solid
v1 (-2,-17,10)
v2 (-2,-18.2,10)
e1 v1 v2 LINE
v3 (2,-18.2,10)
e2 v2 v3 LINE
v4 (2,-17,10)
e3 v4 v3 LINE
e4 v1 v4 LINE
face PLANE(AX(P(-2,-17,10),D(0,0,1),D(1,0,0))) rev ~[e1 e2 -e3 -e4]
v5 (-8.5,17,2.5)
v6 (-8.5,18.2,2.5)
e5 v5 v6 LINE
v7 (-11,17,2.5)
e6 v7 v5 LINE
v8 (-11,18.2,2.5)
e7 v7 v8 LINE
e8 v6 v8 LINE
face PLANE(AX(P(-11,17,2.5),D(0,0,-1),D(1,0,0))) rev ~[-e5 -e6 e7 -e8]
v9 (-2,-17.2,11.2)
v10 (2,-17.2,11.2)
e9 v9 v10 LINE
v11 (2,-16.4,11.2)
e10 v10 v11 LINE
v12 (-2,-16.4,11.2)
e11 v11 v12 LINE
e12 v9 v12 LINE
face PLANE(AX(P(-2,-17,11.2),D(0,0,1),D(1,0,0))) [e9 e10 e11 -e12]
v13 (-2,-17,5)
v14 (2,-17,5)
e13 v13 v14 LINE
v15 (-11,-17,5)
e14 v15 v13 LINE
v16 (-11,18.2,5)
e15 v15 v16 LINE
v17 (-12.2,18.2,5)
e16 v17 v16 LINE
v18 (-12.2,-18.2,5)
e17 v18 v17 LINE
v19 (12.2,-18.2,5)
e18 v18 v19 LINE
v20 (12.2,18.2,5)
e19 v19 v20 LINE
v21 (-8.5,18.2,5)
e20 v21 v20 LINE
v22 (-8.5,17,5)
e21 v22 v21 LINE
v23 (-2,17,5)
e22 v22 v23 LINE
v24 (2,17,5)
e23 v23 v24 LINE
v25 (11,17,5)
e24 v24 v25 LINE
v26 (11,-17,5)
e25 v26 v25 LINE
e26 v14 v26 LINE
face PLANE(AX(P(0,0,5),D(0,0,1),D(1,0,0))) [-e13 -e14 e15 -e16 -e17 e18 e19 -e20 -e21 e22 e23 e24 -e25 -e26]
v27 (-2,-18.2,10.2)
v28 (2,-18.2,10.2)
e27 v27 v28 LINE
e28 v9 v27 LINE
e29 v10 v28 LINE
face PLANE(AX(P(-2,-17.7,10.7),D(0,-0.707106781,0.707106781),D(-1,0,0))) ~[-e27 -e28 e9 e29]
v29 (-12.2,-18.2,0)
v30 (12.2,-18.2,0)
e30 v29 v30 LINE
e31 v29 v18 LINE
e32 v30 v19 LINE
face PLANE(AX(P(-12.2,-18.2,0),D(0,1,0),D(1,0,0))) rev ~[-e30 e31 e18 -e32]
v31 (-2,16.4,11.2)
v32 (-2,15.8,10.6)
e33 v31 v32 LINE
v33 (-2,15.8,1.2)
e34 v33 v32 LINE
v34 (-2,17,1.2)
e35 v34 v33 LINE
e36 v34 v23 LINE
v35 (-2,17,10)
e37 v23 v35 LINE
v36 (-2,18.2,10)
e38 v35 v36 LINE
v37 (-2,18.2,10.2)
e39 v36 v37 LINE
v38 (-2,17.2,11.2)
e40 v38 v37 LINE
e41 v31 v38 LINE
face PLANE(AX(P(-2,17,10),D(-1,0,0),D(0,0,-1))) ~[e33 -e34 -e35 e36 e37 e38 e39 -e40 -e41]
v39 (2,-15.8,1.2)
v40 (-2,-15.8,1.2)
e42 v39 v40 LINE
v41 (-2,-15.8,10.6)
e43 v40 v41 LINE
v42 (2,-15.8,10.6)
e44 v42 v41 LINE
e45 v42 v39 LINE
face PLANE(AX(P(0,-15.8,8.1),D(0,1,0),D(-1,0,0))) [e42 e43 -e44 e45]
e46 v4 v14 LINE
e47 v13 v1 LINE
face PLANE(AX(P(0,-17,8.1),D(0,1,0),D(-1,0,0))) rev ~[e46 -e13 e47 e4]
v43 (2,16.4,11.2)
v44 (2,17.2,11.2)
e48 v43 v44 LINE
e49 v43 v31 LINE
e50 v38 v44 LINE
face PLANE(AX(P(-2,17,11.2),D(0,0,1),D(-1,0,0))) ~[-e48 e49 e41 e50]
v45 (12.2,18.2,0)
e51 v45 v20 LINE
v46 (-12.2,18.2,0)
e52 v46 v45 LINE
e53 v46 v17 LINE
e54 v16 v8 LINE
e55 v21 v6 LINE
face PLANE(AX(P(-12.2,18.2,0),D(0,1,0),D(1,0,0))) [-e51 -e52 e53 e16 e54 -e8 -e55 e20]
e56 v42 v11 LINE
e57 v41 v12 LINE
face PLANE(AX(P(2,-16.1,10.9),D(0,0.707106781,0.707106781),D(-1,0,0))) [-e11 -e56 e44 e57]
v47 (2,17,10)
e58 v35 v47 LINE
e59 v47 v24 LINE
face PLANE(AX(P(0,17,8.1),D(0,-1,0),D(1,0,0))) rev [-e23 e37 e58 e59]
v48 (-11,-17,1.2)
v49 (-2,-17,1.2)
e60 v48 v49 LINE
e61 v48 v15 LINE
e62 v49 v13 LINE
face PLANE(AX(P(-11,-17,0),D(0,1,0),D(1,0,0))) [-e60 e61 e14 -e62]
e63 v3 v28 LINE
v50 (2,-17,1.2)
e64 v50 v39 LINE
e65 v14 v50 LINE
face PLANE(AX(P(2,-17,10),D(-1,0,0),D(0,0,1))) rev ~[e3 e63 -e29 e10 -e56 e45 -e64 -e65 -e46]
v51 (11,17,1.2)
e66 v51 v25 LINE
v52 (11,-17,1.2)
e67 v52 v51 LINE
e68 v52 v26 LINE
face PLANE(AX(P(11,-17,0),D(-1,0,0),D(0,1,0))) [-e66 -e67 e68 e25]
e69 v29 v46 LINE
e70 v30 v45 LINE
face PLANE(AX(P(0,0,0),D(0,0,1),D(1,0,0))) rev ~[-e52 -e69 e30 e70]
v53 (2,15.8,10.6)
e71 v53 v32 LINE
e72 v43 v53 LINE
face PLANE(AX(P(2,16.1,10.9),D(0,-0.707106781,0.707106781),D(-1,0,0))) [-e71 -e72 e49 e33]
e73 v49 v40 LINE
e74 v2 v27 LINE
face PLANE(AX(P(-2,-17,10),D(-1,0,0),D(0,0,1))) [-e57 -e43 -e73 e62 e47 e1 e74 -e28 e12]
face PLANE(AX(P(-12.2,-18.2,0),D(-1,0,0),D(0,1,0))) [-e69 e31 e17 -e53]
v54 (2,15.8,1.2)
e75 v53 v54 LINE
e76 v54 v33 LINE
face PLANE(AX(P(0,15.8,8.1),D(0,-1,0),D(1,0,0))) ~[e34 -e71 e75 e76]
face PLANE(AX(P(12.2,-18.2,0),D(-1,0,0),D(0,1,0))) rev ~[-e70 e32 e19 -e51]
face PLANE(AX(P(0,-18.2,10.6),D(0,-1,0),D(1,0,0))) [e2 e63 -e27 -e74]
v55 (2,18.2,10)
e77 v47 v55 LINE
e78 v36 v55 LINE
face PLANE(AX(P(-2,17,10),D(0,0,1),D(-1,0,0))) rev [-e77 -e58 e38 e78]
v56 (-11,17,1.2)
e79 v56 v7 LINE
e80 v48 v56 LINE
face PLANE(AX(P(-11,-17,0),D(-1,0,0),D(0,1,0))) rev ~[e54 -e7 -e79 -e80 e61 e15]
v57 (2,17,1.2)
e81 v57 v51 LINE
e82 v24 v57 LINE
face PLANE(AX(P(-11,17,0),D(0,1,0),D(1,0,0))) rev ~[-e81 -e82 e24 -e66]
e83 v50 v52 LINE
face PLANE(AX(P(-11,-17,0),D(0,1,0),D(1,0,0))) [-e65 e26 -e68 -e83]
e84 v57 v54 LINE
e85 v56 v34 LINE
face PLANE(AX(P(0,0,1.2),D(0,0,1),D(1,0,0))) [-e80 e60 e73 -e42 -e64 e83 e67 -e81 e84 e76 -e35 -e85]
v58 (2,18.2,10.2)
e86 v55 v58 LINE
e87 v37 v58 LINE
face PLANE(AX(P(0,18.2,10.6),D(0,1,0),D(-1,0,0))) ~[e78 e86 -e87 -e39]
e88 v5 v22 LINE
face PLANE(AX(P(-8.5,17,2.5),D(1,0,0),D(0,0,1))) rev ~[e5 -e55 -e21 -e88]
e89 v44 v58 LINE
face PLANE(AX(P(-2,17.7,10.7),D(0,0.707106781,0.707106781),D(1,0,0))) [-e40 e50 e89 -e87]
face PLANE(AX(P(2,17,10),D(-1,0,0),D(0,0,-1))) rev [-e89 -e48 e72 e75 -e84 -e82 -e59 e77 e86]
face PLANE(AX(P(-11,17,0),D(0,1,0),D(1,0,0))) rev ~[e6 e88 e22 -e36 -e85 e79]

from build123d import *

# Parameters (mm, degrees)
F0_W      = 22
F0_H      = 34
F1_DEPTH  = 1.2
F0_W_2    = 24.4
F0_H_2    = 36.4
F2_DEPTH  = 5
F3_W      = 4
F3_H      = 6.2
F3_H_2    = 3.8
F4_DEPTH  = 1.2
F5_SIZE   = 0.6
F6_W      = 4
F6_H      = 1.2
F7_DEPTH  = 1.2
F8_SIZE   = 1
F9_W      = 2.5
F9_H      = 2.5
F10_DEPTH = 25


# Not quite as in the source:
# - a pattern or mirror of a feature is missing from the dataset's text; its kind, count and spacing are read off the source's solid


with BuildPart() as f1:
    # F0 (on Top) → F1 (new body)
    with BuildSketch(Plane.XY):
        Rectangle(F0_W, F0_H)
    extrude(amount=F1_DEPTH)

    # F0 (on Top) → F2 (join)
    with BuildSketch(Plane.XY):
        Rectangle(F0_W_2, F0_H_2)
        Rectangle(F0_W, F0_H, mode=Mode.SUBTRACT)
    extrude(amount=F2_DEPTH)

    # F3 (on face) → F4 (join)
    with BuildSketch(Plane(origin=(0, -17, 0), x_dir=(-1, 0, 0), z_dir=(0, 1, 0))):
        with Locations((0, 8.1)):
            Rectangle(F3_W, F3_H)
        with Locations((0, 3.1)):
            Rectangle(F3_W, F3_H_2)
    f4 = extrude(amount=F4_DEPTH)

    # F4_copies: F4 across plane
    add(f4.mirror(Plane.ZX))

    # F5
    f5_edges = [f1.edges().sort_by_distance(p)[0] for p in [
        (0, -15.8, 11.2),
        (0, 15.8, 11.2),
    ]]
    chamfer(f5_edges, length=F5_SIZE)

    # F6 (on face) → F7 (join)
    with BuildSketch(Plane.XZ.offset(17)):
        with Locations((0, 10.6)):
            Rectangle(F6_W, F6_H)
    f7 = extrude(amount=F7_DEPTH)

    # F7_copies: F7 across plane
    add(f7.mirror(Plane.ZX))

    # F8
    f8_edges = [f1.edges().sort_by_distance(p)[0] for p in [
        (0, -18.2, 11.2),
        (0, 18.2, 11.2),
    ]]
    chamfer(f8_edges, length=F8_SIZE)

    # F9 (on face) → F10 (cut)
    with BuildSketch(Plane.XZ.offset(-17)):
        with Locations((-9.75, 3.75)):
            Rectangle(F9_W, F9_H)
    extrude(amount=-F10_DEPTH, mode=Mode.SUBTRACT)


solid = f1.part
